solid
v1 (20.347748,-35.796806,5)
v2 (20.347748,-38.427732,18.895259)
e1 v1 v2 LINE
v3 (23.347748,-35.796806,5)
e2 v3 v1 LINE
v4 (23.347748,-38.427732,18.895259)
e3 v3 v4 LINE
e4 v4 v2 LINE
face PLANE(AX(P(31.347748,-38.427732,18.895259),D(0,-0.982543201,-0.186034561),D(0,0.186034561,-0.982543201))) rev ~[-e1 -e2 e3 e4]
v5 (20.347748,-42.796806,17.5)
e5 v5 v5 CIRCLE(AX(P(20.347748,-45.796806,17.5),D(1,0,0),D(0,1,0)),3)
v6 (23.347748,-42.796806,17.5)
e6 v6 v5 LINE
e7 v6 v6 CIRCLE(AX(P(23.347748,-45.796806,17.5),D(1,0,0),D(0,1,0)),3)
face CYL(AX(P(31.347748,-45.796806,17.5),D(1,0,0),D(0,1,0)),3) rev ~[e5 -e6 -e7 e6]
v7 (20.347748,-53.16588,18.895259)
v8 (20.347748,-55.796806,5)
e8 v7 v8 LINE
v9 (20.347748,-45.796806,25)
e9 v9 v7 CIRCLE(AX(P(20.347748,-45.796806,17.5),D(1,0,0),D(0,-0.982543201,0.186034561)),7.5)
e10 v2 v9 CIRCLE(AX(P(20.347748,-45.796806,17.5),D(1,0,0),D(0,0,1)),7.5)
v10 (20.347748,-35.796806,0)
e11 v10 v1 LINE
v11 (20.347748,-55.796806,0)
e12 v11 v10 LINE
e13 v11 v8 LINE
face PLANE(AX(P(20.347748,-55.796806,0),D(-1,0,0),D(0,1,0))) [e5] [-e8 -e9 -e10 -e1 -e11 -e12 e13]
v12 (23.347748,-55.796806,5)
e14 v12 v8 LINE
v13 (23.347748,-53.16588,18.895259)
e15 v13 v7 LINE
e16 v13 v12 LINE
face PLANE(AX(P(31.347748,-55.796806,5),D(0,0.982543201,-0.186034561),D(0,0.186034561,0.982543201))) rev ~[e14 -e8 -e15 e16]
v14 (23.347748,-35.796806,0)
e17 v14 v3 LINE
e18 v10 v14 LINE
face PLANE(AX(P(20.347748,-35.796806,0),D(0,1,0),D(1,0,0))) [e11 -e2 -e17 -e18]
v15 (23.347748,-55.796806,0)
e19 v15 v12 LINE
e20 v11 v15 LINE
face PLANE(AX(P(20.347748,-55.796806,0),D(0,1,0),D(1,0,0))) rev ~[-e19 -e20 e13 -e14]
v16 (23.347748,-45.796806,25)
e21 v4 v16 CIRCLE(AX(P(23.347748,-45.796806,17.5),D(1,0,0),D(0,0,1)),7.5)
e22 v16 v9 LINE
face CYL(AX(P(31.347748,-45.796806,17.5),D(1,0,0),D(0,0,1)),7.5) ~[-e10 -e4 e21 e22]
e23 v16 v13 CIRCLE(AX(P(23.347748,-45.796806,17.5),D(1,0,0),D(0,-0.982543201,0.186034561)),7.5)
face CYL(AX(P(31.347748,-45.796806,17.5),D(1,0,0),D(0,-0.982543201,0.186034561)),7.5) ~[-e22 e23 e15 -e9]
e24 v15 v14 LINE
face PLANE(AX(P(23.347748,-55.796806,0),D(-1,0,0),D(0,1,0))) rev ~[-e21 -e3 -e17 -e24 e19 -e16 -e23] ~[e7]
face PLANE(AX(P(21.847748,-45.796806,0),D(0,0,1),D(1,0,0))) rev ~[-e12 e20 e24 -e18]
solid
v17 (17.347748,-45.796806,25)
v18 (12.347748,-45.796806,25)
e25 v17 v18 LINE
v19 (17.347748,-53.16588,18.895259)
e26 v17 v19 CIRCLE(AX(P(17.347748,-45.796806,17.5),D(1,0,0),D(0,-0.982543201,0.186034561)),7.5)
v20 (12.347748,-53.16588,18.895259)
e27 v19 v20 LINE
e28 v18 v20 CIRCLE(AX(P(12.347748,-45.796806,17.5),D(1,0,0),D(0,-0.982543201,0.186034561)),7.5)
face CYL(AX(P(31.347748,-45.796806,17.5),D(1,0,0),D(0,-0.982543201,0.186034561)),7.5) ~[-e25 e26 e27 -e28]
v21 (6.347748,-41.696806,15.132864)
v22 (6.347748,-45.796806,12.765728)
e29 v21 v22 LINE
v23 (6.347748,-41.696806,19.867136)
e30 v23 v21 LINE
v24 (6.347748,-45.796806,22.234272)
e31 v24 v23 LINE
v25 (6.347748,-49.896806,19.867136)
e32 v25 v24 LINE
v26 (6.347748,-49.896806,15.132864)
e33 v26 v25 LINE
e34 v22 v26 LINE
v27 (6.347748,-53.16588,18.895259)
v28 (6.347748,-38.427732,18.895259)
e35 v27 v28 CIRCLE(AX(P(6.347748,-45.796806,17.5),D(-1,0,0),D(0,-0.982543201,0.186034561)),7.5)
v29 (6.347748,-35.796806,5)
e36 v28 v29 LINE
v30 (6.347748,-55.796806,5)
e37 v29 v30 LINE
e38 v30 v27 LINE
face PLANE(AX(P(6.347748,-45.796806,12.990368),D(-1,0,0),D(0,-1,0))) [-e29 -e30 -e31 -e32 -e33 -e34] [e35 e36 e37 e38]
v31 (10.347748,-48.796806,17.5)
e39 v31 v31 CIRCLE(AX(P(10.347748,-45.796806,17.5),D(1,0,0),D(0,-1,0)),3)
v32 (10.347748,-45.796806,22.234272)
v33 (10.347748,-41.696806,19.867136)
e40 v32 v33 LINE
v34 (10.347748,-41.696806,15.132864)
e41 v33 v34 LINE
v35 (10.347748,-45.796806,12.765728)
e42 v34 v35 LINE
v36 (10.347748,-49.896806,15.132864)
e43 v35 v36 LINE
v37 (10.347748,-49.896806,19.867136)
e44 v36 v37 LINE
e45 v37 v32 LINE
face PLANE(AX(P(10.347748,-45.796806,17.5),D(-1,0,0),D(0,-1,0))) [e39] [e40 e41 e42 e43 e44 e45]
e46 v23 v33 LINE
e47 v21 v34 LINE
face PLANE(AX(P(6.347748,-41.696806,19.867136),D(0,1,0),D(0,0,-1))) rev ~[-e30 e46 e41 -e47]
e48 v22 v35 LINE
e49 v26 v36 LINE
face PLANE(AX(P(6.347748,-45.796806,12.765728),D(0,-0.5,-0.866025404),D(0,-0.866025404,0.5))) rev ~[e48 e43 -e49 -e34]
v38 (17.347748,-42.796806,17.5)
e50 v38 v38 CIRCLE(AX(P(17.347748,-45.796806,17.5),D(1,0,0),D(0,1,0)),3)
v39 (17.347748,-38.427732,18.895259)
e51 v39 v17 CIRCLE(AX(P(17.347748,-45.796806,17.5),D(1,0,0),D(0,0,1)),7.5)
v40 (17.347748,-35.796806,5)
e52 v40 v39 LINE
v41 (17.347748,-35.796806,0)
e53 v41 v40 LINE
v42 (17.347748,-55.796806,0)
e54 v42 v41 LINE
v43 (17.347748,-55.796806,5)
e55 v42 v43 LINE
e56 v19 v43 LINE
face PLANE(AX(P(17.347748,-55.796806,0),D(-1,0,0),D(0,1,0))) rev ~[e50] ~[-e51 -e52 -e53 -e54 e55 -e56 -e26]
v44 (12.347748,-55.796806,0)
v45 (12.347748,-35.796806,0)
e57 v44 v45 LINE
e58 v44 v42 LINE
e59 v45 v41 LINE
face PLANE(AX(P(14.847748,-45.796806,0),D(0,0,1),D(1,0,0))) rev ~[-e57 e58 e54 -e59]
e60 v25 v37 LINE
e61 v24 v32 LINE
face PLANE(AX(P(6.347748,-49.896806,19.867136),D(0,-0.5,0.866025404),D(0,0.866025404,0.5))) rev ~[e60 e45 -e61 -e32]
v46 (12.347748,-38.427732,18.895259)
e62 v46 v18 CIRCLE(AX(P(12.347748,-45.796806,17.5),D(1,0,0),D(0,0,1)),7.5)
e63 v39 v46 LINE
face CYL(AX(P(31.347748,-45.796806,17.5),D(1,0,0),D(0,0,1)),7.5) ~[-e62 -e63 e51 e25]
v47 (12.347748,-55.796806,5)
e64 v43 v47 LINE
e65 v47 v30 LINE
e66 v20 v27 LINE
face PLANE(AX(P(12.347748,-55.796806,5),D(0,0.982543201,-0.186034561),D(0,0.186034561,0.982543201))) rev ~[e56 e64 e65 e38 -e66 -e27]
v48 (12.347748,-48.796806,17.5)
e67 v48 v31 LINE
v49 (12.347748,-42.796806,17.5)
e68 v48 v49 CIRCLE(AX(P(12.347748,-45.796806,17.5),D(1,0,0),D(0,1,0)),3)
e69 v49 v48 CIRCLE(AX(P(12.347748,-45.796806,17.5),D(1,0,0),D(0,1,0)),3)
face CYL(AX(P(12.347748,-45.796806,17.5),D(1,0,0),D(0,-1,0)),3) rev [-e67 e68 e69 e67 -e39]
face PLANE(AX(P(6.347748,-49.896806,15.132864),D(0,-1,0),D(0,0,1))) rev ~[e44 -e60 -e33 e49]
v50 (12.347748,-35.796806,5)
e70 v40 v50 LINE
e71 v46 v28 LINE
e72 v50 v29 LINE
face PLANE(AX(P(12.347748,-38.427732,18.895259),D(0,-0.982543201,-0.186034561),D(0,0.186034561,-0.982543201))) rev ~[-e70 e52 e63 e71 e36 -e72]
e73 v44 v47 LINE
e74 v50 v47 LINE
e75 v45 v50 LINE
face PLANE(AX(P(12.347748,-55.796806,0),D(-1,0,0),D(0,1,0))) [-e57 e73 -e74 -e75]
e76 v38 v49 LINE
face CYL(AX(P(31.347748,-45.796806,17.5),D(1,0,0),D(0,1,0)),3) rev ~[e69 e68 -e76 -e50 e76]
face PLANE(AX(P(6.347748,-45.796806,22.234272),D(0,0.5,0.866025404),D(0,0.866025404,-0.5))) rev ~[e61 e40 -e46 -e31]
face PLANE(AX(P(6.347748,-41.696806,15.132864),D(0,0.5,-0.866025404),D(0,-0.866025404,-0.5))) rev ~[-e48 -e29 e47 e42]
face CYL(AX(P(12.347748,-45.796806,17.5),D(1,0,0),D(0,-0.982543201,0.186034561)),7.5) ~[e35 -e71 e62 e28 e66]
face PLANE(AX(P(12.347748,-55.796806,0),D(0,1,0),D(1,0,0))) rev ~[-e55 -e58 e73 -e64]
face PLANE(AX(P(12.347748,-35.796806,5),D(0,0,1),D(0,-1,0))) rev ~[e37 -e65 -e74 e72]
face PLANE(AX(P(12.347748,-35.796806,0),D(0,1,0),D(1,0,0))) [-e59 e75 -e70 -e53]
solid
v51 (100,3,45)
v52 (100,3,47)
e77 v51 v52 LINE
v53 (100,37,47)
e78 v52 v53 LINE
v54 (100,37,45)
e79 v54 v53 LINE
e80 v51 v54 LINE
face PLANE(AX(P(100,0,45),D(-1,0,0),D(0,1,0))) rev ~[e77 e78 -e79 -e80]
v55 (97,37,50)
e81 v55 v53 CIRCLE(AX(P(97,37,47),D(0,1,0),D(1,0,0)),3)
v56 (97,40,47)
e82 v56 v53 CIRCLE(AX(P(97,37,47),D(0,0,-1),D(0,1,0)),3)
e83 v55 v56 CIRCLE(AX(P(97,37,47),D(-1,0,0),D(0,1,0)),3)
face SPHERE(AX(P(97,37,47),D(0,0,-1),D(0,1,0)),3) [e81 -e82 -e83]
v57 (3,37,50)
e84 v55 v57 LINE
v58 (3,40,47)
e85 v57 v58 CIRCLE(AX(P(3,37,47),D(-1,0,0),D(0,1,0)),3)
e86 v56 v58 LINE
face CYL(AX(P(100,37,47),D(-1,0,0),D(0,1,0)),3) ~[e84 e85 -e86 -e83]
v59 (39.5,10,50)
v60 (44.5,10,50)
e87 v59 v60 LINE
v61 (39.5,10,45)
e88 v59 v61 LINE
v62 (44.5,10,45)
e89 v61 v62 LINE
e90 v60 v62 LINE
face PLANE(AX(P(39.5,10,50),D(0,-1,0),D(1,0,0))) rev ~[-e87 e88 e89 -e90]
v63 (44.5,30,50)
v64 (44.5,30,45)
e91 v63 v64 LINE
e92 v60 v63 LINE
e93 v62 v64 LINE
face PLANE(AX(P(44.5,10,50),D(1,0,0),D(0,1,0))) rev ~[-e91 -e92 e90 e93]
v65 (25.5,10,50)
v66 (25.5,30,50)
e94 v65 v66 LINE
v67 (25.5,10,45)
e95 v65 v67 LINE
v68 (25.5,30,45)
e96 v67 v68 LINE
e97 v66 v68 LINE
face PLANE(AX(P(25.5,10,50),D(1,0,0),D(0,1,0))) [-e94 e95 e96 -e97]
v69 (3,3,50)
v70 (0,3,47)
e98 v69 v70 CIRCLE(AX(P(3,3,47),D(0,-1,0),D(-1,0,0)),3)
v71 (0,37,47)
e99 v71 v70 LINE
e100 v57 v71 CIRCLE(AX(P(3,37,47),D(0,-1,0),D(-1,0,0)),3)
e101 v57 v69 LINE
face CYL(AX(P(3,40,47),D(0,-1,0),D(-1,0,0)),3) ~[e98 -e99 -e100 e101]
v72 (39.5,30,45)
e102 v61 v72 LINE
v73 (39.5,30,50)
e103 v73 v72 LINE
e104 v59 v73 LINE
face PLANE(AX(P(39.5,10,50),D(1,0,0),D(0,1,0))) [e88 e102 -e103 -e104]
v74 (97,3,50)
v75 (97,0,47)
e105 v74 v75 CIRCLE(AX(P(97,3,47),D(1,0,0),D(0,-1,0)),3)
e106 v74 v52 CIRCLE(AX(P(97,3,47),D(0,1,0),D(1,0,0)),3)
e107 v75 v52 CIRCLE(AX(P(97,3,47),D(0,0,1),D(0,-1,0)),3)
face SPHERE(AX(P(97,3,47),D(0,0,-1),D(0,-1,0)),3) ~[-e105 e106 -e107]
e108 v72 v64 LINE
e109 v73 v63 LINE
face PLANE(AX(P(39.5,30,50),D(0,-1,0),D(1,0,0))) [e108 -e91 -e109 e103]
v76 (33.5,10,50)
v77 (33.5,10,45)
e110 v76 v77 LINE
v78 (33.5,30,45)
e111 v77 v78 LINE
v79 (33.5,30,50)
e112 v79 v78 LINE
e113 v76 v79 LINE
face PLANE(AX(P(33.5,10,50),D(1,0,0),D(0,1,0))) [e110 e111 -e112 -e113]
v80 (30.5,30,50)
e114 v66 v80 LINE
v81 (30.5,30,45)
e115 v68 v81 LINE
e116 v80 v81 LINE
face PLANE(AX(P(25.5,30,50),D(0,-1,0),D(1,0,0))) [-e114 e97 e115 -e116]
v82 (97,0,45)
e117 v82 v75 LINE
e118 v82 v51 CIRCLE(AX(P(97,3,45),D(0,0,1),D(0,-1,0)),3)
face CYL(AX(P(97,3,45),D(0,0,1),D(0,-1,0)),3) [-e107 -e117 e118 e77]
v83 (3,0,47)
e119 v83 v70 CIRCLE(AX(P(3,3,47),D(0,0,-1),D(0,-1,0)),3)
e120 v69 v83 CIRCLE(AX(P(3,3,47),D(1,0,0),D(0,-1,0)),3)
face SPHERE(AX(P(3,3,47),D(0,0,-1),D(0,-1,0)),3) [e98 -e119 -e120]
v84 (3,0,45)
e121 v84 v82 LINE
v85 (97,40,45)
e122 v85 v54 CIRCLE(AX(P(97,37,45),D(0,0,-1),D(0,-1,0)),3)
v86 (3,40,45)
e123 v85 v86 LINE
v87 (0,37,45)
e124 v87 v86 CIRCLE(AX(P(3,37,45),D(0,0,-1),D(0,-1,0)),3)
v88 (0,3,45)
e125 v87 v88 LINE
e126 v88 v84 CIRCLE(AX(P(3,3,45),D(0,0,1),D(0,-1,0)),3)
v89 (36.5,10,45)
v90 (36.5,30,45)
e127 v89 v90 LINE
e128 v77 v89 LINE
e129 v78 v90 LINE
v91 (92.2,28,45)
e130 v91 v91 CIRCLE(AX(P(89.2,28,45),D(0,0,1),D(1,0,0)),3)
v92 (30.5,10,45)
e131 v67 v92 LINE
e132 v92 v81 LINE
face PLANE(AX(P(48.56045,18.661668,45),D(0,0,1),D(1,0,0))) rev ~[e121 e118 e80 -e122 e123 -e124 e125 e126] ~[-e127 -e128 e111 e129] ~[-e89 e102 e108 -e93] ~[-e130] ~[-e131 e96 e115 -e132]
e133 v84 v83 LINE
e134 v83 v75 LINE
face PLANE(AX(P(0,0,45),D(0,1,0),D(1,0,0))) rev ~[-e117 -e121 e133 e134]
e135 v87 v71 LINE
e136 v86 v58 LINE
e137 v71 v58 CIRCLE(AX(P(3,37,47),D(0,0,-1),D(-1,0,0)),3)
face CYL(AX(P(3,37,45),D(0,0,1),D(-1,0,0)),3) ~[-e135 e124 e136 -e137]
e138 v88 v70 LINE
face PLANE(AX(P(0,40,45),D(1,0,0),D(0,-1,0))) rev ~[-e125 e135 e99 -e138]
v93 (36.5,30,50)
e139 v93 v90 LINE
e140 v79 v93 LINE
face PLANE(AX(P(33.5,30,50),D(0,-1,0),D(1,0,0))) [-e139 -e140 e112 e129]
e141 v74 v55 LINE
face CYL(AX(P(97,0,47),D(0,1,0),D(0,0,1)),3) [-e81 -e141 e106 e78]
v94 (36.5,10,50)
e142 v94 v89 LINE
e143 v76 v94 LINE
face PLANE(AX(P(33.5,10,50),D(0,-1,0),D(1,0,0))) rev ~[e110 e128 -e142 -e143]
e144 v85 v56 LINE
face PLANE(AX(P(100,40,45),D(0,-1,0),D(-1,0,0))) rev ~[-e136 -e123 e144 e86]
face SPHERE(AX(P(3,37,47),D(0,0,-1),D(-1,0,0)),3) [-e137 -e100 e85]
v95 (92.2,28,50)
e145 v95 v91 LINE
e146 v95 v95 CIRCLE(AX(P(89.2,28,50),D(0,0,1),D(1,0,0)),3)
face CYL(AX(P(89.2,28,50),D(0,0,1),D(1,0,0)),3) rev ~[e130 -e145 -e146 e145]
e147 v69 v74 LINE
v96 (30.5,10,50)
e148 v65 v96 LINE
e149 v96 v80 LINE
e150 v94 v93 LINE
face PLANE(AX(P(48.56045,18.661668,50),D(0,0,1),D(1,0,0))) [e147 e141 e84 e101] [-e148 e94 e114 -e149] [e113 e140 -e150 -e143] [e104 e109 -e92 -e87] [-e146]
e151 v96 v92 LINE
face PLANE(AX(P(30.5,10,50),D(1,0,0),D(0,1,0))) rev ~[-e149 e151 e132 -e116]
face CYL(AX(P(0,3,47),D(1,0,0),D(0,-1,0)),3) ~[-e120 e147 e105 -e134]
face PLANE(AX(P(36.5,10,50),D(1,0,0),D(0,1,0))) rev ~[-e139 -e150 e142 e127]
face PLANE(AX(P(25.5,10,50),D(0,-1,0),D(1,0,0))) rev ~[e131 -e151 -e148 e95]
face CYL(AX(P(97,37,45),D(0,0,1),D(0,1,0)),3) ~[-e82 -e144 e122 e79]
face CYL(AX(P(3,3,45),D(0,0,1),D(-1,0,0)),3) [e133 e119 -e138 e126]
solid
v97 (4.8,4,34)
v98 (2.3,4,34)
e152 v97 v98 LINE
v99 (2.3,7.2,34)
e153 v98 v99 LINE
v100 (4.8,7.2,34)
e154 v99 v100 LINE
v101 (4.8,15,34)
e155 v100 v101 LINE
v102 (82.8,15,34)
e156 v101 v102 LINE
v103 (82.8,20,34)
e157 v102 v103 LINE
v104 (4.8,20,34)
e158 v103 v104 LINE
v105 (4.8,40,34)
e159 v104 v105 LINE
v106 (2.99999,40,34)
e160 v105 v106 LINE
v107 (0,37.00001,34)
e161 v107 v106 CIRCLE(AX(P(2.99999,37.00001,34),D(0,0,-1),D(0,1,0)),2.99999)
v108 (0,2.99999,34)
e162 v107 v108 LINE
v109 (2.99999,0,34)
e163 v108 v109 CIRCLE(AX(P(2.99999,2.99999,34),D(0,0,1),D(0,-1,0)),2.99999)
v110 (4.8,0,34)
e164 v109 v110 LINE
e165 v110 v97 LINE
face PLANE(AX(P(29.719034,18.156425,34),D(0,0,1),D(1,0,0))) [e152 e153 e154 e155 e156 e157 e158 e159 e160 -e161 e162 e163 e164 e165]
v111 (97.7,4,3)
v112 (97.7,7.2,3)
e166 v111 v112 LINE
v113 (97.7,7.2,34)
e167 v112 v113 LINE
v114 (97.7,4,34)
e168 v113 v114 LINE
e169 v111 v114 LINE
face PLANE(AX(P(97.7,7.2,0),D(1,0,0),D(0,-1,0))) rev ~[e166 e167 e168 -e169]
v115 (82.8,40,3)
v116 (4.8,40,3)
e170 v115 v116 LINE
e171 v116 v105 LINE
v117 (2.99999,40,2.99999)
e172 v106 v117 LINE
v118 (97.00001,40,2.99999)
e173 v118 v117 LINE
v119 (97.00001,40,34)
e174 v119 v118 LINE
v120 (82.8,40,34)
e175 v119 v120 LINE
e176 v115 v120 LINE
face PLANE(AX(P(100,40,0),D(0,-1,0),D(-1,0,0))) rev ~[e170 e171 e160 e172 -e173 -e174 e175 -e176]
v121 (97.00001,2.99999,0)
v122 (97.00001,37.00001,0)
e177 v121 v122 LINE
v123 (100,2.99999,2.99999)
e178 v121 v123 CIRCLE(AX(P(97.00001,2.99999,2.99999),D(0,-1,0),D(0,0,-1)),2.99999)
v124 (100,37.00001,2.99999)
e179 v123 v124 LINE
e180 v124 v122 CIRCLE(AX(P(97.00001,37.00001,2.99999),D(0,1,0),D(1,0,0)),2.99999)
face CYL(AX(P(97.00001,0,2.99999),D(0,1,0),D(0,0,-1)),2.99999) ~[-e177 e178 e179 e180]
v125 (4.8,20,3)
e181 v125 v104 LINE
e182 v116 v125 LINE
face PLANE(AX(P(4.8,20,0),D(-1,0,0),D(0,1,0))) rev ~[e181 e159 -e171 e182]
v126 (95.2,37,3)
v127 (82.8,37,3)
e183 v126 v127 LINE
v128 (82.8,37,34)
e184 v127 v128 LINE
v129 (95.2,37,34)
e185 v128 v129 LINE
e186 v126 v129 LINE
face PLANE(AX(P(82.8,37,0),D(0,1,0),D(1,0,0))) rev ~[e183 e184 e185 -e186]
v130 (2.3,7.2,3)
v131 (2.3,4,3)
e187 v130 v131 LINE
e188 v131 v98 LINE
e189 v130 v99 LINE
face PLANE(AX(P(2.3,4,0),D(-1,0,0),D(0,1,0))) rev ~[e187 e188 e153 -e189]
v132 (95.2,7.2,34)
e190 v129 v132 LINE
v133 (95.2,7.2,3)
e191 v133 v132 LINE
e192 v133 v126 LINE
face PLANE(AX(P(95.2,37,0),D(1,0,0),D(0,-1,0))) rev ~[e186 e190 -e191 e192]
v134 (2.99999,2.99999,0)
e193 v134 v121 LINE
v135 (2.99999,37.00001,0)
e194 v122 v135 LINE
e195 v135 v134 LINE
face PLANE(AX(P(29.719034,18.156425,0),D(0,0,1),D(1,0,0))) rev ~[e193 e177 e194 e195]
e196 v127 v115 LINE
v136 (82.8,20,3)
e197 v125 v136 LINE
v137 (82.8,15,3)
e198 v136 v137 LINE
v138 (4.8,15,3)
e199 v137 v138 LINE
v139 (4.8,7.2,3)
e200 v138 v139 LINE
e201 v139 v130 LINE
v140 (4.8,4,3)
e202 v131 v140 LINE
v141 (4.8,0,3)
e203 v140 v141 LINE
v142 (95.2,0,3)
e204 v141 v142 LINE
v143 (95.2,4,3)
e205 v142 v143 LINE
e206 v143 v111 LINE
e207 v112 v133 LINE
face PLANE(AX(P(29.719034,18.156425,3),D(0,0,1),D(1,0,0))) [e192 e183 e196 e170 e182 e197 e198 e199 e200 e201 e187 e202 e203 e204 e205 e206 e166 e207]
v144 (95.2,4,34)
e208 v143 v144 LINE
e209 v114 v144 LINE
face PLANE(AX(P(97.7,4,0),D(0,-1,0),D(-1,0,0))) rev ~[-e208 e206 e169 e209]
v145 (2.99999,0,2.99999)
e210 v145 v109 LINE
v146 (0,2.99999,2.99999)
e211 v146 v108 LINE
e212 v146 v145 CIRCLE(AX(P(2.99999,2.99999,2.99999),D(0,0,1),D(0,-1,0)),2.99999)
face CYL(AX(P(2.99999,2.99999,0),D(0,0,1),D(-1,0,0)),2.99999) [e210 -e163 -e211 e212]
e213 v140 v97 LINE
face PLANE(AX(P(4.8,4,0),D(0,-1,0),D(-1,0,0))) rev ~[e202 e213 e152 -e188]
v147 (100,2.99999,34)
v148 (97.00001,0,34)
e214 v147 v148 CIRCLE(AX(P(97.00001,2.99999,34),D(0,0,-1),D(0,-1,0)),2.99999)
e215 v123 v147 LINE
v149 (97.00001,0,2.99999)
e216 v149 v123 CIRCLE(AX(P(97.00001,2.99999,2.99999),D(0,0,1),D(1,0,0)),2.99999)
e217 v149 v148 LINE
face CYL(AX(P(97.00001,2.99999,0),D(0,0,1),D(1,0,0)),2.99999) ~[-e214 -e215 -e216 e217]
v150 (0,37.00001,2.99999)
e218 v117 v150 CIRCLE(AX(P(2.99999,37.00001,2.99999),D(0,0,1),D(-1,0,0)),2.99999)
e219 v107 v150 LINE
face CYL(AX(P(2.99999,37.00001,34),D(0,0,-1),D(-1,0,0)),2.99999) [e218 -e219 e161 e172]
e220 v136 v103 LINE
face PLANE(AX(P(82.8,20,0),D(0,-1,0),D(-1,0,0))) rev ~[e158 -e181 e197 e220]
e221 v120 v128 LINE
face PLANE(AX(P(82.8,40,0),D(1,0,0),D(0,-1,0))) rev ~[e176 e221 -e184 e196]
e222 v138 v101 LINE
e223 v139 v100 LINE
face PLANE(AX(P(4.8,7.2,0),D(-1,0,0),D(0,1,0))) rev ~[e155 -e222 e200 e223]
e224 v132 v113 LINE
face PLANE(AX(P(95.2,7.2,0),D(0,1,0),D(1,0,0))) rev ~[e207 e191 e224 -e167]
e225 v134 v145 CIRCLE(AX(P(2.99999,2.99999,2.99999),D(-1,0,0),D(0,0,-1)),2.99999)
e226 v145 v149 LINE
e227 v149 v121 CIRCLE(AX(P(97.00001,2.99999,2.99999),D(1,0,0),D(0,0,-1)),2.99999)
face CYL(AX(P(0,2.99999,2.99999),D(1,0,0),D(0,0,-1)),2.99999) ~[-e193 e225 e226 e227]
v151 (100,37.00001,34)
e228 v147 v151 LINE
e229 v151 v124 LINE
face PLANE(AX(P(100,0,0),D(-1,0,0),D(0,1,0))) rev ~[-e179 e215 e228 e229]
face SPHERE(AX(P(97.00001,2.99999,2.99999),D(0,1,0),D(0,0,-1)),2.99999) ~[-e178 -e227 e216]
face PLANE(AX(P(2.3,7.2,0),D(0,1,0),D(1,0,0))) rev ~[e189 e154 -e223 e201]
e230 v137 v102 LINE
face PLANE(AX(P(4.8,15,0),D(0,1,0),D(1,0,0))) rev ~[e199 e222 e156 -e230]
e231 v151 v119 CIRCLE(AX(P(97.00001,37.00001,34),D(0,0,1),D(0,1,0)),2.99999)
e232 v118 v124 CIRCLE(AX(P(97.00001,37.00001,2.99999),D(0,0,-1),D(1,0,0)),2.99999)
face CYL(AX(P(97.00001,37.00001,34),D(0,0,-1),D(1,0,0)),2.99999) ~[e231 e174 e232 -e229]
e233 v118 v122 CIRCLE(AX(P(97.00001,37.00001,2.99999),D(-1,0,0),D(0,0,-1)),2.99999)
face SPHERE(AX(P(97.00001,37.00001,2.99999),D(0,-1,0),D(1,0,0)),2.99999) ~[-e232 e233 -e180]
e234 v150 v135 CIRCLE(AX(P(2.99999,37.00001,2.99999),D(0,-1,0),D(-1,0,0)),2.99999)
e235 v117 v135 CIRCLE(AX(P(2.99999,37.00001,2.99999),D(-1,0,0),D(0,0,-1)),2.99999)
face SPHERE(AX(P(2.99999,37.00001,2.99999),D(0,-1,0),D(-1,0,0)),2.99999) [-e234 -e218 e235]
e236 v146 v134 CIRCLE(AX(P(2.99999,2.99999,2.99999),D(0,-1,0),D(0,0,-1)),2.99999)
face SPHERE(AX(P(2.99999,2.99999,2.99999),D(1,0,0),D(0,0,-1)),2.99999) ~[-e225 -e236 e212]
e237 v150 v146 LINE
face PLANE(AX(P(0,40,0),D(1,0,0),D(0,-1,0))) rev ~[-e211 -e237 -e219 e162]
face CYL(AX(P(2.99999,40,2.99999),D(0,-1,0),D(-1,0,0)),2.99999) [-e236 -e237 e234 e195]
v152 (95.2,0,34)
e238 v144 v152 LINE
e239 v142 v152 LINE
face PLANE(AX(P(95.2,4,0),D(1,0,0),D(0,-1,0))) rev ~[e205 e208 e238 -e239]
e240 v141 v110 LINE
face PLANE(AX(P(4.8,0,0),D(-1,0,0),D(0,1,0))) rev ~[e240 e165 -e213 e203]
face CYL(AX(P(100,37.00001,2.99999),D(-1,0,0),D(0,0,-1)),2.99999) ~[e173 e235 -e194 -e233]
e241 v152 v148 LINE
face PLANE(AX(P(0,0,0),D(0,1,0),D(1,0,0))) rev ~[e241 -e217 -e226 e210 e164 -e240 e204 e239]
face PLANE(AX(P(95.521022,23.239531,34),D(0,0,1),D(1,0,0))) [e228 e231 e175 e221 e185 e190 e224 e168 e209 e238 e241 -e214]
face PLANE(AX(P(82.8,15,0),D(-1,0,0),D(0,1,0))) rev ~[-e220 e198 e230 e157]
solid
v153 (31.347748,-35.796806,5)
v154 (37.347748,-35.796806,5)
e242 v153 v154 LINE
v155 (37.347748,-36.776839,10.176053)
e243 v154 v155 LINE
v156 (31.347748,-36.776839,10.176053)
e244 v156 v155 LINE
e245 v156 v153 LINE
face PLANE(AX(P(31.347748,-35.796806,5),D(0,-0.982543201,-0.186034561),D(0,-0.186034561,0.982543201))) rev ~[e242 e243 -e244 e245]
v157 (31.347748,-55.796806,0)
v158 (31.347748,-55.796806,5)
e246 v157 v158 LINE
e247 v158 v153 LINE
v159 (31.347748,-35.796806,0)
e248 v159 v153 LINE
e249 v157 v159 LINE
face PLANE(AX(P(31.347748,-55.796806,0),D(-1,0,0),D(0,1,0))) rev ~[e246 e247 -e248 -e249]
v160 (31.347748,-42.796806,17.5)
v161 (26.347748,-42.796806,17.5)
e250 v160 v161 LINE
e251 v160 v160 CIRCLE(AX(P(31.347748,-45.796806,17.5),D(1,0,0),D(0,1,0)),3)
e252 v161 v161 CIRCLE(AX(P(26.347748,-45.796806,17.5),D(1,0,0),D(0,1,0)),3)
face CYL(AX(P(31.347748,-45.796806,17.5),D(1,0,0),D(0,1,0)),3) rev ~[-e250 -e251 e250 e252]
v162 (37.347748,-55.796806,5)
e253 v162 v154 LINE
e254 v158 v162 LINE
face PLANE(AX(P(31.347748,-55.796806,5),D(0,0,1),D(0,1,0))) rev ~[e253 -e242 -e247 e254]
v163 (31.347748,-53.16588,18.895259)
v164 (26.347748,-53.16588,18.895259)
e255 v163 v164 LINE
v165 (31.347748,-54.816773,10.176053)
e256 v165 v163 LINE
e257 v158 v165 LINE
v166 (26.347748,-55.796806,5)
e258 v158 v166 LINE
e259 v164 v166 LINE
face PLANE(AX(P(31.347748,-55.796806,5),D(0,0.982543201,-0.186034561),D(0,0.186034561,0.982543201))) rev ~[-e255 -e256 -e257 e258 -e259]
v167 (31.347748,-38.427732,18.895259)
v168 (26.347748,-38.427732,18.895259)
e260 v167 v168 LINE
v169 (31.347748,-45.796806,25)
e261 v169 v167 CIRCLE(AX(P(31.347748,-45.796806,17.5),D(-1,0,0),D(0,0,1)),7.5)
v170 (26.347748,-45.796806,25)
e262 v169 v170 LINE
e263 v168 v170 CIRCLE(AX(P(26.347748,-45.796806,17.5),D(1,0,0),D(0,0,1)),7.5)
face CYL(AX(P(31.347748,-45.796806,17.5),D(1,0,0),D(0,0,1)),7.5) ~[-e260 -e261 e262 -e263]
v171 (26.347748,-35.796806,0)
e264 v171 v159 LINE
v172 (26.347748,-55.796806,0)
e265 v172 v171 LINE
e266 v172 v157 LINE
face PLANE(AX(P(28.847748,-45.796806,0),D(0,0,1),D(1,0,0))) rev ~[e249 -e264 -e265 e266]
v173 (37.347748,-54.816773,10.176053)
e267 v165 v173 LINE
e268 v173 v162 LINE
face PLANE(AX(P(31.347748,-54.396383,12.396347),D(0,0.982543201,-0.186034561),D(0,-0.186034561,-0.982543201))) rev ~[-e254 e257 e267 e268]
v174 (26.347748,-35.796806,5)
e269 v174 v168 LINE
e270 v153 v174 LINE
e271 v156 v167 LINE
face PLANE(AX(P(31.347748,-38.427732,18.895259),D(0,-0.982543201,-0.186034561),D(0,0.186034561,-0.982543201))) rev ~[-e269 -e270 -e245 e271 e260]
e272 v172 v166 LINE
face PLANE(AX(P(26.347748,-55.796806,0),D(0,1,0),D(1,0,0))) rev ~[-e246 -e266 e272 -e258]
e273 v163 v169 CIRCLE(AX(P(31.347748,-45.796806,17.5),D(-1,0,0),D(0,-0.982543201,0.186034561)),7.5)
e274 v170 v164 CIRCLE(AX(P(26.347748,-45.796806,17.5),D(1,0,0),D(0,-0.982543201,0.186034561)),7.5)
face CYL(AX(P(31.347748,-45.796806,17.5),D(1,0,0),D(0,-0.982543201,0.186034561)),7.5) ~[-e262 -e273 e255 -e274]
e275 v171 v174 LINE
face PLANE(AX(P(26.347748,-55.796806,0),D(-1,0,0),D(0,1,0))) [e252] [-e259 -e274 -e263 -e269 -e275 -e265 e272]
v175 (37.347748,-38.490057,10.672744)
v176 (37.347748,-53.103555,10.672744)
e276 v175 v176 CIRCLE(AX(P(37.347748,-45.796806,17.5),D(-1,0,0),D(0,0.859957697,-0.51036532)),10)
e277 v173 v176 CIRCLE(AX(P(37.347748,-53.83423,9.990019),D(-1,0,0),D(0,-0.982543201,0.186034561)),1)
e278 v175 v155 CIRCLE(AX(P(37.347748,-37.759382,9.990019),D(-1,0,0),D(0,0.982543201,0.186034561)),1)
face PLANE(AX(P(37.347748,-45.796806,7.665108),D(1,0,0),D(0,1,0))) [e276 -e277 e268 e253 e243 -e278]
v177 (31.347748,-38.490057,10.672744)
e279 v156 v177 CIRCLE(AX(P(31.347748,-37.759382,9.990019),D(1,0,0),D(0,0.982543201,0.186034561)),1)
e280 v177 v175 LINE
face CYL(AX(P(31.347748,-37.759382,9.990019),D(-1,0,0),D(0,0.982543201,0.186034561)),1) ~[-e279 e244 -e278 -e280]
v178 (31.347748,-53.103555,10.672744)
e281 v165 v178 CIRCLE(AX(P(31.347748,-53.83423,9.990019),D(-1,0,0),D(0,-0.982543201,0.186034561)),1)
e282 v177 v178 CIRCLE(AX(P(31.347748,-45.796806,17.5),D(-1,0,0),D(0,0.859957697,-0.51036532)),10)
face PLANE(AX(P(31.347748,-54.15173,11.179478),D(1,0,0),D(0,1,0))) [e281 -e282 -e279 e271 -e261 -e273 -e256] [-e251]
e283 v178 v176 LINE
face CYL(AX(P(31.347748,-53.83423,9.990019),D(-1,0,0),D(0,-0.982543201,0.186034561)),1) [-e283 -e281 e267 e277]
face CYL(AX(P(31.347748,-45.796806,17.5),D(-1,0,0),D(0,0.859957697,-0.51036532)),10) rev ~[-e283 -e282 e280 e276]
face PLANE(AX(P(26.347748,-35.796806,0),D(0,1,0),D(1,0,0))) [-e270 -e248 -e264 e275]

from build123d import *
from build123d import SkipClean  # not in build123d's __all__

# Parameters (mm, degrees)
F1_DEPTH     = 3
F2_DEPTH     = 34
F3_R         = 2.99999
F4_START     = 45
F4_DEPTH     = 5
F5_W         = 3
F5_H         = 20
F5_W_2       = 5
F5_R         = 3
F6_DEPTH     = 25
F7_R         = 3
F8_W         = 5
F8_H         = 20
F9_DEPTH     = 25
F8_W_2       = 3
F10_R        = 3
F11_DEPTH    = 25
F13_DEPTH    = 6
F14_T1_DEPTH = 11.6493534925
F15_R        = 3
F16_DEPTH    = 6
F18_DEPTH    = 4


# Not quite as in the source:
# - a fillet or chamfer that OpenCascade refuses, or shapes differently, is made with other operations: its cross-section is extruded or revolved along the edge and cut away or added
# - a fillet or chamfer is up to 0.001 mm smaller than in the source, because OpenCascade refuses the exact size
# - after a boolean that leaves OpenCascade's solid faulty, fix() repairs it


with BuildPart() as f1:
    # F0 (on Top) → F1 (new body)
    with BuildSketch(Plane.XY):
        Polygon((0, 40), (0, 0), (4.8, 0), (4.8, 4), (2.3, 4), (2.3, 7.2), (4.8, 7.2), (4.8, 15), (82.8, 15), (82.8, 20), (4.8, 20), (4.8, 37), (4.8, 40), align=None)
        Polygon((95.2, 4), (95.2, 0), (100, 0), (100, 40), (82.8, 40), (82.8, 37), (95.2, 37), (95.2, 7.2), (97.7, 7.2), (97.7, 4), align=None)
        Polygon((4.8, 4), (4.8, 0), (95.2, 0), (95.2, 4), (97.7, 4), (97.7, 7.2), (95.2, 7.2), (95.2, 37), (82.8, 37), (82.8, 40), (4.8, 40), (4.8, 37), (4.8, 20), (82.8, 20), (82.8, 15), (4.8, 15), (4.8, 7.2), (2.3, 7.2), (2.3, 4), align=None)
    extrude(amount=F1_DEPTH)

    # F0 (on Top) → F2 (join)
    with BuildSketch(Plane.XY):
        Polygon((0, 40), (0, 0), (4.8, 0), (4.8, 4), (2.3, 4), (2.3, 7.2), (4.8, 7.2), (4.8, 15), (82.8, 15), (82.8, 20), (4.8, 20), (4.8, 37), (4.8, 40), align=None)
        Polygon((95.2, 4), (95.2, 0), (100, 0), (100, 40), (82.8, 40), (82.8, 37), (95.2, 37), (95.2, 7.2), (97.7, 7.2), (97.7, 4), align=None)
    extrude(amount=F2_DEPTH)

    # F3 (radius 3 in the source; OpenCascade refuses exactly that, so slightly less here)
    f3_edges = [f1.edges().sort_by_distance(p)[0] for p in [
        (100, 20, 0),
        (50, 0, 0),
        (100, 0, 17),
        (0, 20, 0),
        (0, 0, 17),
        (0, 40, 17),
        (100, 40, 17),
        (50, 40, 0),
    ]]
    fillet(f3_edges, radius=F3_R)


with BuildPart() as f4:
    # F0 (on Top) → F4 (new body)
    with BuildSketch(Plane.XY.offset(F4_START)):
        Polygon((4.8, 4), (4.8, 0), (95.2, 0), (95.2, 4), (97.7, 4), (97.7, 7.2), (95.2, 7.2), (95.2, 37), (82.8, 37), (82.8, 40), (4.8, 40), (4.8, 37), (4.8, 20), (82.8, 20), (82.8, 15), (4.8, 15), (4.8, 7.2), (2.3, 7.2), (2.3, 4), align=None)
        Polygon((0, 40), (0, 0), (4.8, 0), (4.8, 4), (2.3, 4), (2.3, 7.2), (4.8, 7.2), (4.8, 15), (82.8, 15), (82.8, 20), (4.8, 20), (4.8, 37), (4.8, 40), align=None)
        Polygon((95.2, 4), (95.2, 0), (100, 0), (100, 40), (82.8, 40), (82.8, 37), (95.2, 37), (95.2, 7.2), (97.7, 7.2), (97.7, 4), align=None)
    extrude(amount=F4_DEPTH)

    # F5 (on face) → F6 (cut)
    with BuildSketch(Plane.XY.offset(50)):
        with Locations((35, 20)):
            Rectangle(F5_W, F5_H)
        with Locations((28, 20)):
            Rectangle(F5_W_2, F5_H)
        with Locations((42, 20)):
            Rectangle(F5_W_2, F5_H)
        with Locations((89.2, 28)):
            Circle(F5_R)
    extrude(amount=-F6_DEPTH, mode=Mode.SUBTRACT)

    # F7
    f7_edges = [f4.edges().sort_by_distance(p)[0] for p in [
        (0, 0, 47.5),
        (0, 40, 47.5),
        (100, 0, 47.5),
        (100, 40, 47.5),
        (50, 0, 50),
        (0, 20, 50),
        (50, 40, 50),
        (100, 20, 50),
    ]]
    fillet(f7_edges, radius=F7_R)


with BuildPart() as f9:
    # F8 (on Top) → F9 (new body)
    with BuildSketch(Plane.XY):
        with Locations((14.8477478921, -45.7968057692)):
            Rectangle(F8_W, F8_H)
    extrude(amount=F9_DEPTH)


with BuildPart() as f9b:
    # F8 (on Top) → F9, piece 2 (new body)
    with BuildSketch(Plane.XY):
        with Locations((28.8477478921, -45.7968057692)):
            Rectangle(F8_W, F8_H)
    extrude(amount=F9_DEPTH)


with BuildPart() as f9c:
    # F8 (on Top) → F9, piece 3 (new body)
    with BuildSketch(Plane.XY):
        with Locations((21.8477478921, -45.7968057692)):
            Rectangle(F8_W_2, F8_H)
    extrude(amount=F9_DEPTH)


with BuildPart() as f11_tool:
    # F10 (on face) → F11 (new body)
    with BuildSketch(Plane.YZ.offset(31.3477478921)):
        with BuildLine():
            Line((-55.7968057692, 5), (-53.1658797779, 18.8952592069))
            ThreePointArc((-53.1658797779, 18.8952592069), (-50.5814455648, 23.2755711428), (-45.7968057692, 25))
            Line((-45.7968057692, 25), (-55.7968057692, 25))
            Line((-55.7968057692, 25), (-55.7968057692, 5))
        make_face()
        with BuildLine():
            ThreePointArc((-45.7968057692, 25), (-41.0121659736, 23.2755711428), (-38.4277317605, 18.8952592069))
            Line((-38.4277317605, 18.8952592069), (-35.7968057692, 5))
            Line((-35.7968057692, 5), (-35.7968057692, 25))
            Line((-35.7968057692, 25), (-45.7968057692, 25))
        make_face()
        with Locations((-45.7968057692, 17.5)):
            Circle(F10_R)
    extrude(amount=-F11_DEPTH)


with BuildPart() as f9_1:
    add(f9.part, clean=False)

    # F11: cut by f11_tool
    add(f11_tool.part, mode=Mode.SUBTRACT)

    # F15 (on face) → F16 (join)
    with BuildSketch(Plane(origin=(12.3477478921, 0, 0), x_dir=(0, -1, 0), z_dir=(-1, 0, 0))):
        with BuildLine():
            Line((38.4277317605, 18.8952592069), (35.7968057692, 5))
            Line((35.7968057692, 5), (55.7968057692, 5))
            Line((55.7968057692, 5), (53.1658797779, 18.8952592069))
            ThreePointArc((53.1658797779, 18.8952592069), (45.7968057692, 25), (38.4277317605, 18.8952592069))
        make_face()
        with Locations((45.7968057692, 17.5)):
            Circle(F15_R, mode=Mode.SUBTRACT)
    with SkipClean():  # cleaning this boolean's faces spoils the solid; the shape is the same uncleaned
        extrude(amount=F16_DEPTH)

    # F17 (on face) → F18 (cut)
    with BuildSketch(Plane(origin=(6.3477478921, 0, 0), x_dir=(0, -1, 0), z_dir=(-1, 0, 0))):
        Polygon((49.8968057692, 19.8671361037), (45.7968057692, 22.2342722074), (41.6968057692, 19.8671361037), (41.6968057692, 15.1328638963), (45.7968057692, 12.7657277926), (49.8968057692, 15.1328638963), align=None)
    extrude(amount=-F18_DEPTH, mode=Mode.SUBTRACT)

    add(f9_1.part.fix(), mode=Mode.REPLACE)


with BuildPart() as f9b_1:
    add(f9b.part, clean=False)

    # F11: cut by f11_tool
    add(f11_tool.part, mode=Mode.SUBTRACT)

    # F12 (on face) → F13 (join)
    with BuildSketch(Plane.YZ.offset(31.3477478921)):
        with BuildLine():
            Line((-54.3963827366, 12.3963468003), (-55.7968057692, 5))
            Line((-55.7968057692, 5), (-35.7968057692, 5))
            Line((-35.7968057692, 5), (-37.1972288018, 12.3963468003))
            ThreePointArc((-37.1972288018, 12.3963468003), (-45.7968057692, 7.5), (-54.3963827366, 12.3963468003))
        make_face()
    extrude(amount=F13_DEPTH)

    # F14: fillet of radius 1 on 2 edges, made by hand

    # F14_s2 → F14_t1 (cut)
    with BuildSketch(Plane.YZ.offset(31.3477478921)):
        with BuildLine():
            ThreePointArc((-54.8167727352, 10.1760532544), (-54.1126804314, 10.9504691595), (-53.1035546463, 10.6727442668))
            ThreePointArc((-53.1035546463, 10.6727442668), (-53.7965246325, 11.4996251693), (-54.3963827366, 12.3963468003))
            Line((-54.3963827366, 12.3963468003), (-54.8167727352, 10.1760532544))
        make_face()
        with BuildLine():
            ThreePointArc((-36.7768388032, 10.1760532544), (-37.480931107, 10.9504691595), (-38.4900568921, 10.6727442668))
            ThreePointArc((-38.4900568921, 10.6727442668), (-37.797086906, 11.4996251693), (-37.1972288018, 12.3963468003))
            Line((-37.1972288018, 12.3963468003), (-36.7768388032, 10.1760532544))
        make_face()
    extrude(amount=F14_T1_DEPTH, mode=Mode.SUBTRACT)


with BuildPart() as f9c_1:
    add(f9c.part, clean=False)

    # F11: cut by f11_tool
    add(f11_tool.part, mode=Mode.SUBTRACT)


solid = Compound([f1.part, f4.part, f9_1.part, f9b_1.part, f9c_1.part])
